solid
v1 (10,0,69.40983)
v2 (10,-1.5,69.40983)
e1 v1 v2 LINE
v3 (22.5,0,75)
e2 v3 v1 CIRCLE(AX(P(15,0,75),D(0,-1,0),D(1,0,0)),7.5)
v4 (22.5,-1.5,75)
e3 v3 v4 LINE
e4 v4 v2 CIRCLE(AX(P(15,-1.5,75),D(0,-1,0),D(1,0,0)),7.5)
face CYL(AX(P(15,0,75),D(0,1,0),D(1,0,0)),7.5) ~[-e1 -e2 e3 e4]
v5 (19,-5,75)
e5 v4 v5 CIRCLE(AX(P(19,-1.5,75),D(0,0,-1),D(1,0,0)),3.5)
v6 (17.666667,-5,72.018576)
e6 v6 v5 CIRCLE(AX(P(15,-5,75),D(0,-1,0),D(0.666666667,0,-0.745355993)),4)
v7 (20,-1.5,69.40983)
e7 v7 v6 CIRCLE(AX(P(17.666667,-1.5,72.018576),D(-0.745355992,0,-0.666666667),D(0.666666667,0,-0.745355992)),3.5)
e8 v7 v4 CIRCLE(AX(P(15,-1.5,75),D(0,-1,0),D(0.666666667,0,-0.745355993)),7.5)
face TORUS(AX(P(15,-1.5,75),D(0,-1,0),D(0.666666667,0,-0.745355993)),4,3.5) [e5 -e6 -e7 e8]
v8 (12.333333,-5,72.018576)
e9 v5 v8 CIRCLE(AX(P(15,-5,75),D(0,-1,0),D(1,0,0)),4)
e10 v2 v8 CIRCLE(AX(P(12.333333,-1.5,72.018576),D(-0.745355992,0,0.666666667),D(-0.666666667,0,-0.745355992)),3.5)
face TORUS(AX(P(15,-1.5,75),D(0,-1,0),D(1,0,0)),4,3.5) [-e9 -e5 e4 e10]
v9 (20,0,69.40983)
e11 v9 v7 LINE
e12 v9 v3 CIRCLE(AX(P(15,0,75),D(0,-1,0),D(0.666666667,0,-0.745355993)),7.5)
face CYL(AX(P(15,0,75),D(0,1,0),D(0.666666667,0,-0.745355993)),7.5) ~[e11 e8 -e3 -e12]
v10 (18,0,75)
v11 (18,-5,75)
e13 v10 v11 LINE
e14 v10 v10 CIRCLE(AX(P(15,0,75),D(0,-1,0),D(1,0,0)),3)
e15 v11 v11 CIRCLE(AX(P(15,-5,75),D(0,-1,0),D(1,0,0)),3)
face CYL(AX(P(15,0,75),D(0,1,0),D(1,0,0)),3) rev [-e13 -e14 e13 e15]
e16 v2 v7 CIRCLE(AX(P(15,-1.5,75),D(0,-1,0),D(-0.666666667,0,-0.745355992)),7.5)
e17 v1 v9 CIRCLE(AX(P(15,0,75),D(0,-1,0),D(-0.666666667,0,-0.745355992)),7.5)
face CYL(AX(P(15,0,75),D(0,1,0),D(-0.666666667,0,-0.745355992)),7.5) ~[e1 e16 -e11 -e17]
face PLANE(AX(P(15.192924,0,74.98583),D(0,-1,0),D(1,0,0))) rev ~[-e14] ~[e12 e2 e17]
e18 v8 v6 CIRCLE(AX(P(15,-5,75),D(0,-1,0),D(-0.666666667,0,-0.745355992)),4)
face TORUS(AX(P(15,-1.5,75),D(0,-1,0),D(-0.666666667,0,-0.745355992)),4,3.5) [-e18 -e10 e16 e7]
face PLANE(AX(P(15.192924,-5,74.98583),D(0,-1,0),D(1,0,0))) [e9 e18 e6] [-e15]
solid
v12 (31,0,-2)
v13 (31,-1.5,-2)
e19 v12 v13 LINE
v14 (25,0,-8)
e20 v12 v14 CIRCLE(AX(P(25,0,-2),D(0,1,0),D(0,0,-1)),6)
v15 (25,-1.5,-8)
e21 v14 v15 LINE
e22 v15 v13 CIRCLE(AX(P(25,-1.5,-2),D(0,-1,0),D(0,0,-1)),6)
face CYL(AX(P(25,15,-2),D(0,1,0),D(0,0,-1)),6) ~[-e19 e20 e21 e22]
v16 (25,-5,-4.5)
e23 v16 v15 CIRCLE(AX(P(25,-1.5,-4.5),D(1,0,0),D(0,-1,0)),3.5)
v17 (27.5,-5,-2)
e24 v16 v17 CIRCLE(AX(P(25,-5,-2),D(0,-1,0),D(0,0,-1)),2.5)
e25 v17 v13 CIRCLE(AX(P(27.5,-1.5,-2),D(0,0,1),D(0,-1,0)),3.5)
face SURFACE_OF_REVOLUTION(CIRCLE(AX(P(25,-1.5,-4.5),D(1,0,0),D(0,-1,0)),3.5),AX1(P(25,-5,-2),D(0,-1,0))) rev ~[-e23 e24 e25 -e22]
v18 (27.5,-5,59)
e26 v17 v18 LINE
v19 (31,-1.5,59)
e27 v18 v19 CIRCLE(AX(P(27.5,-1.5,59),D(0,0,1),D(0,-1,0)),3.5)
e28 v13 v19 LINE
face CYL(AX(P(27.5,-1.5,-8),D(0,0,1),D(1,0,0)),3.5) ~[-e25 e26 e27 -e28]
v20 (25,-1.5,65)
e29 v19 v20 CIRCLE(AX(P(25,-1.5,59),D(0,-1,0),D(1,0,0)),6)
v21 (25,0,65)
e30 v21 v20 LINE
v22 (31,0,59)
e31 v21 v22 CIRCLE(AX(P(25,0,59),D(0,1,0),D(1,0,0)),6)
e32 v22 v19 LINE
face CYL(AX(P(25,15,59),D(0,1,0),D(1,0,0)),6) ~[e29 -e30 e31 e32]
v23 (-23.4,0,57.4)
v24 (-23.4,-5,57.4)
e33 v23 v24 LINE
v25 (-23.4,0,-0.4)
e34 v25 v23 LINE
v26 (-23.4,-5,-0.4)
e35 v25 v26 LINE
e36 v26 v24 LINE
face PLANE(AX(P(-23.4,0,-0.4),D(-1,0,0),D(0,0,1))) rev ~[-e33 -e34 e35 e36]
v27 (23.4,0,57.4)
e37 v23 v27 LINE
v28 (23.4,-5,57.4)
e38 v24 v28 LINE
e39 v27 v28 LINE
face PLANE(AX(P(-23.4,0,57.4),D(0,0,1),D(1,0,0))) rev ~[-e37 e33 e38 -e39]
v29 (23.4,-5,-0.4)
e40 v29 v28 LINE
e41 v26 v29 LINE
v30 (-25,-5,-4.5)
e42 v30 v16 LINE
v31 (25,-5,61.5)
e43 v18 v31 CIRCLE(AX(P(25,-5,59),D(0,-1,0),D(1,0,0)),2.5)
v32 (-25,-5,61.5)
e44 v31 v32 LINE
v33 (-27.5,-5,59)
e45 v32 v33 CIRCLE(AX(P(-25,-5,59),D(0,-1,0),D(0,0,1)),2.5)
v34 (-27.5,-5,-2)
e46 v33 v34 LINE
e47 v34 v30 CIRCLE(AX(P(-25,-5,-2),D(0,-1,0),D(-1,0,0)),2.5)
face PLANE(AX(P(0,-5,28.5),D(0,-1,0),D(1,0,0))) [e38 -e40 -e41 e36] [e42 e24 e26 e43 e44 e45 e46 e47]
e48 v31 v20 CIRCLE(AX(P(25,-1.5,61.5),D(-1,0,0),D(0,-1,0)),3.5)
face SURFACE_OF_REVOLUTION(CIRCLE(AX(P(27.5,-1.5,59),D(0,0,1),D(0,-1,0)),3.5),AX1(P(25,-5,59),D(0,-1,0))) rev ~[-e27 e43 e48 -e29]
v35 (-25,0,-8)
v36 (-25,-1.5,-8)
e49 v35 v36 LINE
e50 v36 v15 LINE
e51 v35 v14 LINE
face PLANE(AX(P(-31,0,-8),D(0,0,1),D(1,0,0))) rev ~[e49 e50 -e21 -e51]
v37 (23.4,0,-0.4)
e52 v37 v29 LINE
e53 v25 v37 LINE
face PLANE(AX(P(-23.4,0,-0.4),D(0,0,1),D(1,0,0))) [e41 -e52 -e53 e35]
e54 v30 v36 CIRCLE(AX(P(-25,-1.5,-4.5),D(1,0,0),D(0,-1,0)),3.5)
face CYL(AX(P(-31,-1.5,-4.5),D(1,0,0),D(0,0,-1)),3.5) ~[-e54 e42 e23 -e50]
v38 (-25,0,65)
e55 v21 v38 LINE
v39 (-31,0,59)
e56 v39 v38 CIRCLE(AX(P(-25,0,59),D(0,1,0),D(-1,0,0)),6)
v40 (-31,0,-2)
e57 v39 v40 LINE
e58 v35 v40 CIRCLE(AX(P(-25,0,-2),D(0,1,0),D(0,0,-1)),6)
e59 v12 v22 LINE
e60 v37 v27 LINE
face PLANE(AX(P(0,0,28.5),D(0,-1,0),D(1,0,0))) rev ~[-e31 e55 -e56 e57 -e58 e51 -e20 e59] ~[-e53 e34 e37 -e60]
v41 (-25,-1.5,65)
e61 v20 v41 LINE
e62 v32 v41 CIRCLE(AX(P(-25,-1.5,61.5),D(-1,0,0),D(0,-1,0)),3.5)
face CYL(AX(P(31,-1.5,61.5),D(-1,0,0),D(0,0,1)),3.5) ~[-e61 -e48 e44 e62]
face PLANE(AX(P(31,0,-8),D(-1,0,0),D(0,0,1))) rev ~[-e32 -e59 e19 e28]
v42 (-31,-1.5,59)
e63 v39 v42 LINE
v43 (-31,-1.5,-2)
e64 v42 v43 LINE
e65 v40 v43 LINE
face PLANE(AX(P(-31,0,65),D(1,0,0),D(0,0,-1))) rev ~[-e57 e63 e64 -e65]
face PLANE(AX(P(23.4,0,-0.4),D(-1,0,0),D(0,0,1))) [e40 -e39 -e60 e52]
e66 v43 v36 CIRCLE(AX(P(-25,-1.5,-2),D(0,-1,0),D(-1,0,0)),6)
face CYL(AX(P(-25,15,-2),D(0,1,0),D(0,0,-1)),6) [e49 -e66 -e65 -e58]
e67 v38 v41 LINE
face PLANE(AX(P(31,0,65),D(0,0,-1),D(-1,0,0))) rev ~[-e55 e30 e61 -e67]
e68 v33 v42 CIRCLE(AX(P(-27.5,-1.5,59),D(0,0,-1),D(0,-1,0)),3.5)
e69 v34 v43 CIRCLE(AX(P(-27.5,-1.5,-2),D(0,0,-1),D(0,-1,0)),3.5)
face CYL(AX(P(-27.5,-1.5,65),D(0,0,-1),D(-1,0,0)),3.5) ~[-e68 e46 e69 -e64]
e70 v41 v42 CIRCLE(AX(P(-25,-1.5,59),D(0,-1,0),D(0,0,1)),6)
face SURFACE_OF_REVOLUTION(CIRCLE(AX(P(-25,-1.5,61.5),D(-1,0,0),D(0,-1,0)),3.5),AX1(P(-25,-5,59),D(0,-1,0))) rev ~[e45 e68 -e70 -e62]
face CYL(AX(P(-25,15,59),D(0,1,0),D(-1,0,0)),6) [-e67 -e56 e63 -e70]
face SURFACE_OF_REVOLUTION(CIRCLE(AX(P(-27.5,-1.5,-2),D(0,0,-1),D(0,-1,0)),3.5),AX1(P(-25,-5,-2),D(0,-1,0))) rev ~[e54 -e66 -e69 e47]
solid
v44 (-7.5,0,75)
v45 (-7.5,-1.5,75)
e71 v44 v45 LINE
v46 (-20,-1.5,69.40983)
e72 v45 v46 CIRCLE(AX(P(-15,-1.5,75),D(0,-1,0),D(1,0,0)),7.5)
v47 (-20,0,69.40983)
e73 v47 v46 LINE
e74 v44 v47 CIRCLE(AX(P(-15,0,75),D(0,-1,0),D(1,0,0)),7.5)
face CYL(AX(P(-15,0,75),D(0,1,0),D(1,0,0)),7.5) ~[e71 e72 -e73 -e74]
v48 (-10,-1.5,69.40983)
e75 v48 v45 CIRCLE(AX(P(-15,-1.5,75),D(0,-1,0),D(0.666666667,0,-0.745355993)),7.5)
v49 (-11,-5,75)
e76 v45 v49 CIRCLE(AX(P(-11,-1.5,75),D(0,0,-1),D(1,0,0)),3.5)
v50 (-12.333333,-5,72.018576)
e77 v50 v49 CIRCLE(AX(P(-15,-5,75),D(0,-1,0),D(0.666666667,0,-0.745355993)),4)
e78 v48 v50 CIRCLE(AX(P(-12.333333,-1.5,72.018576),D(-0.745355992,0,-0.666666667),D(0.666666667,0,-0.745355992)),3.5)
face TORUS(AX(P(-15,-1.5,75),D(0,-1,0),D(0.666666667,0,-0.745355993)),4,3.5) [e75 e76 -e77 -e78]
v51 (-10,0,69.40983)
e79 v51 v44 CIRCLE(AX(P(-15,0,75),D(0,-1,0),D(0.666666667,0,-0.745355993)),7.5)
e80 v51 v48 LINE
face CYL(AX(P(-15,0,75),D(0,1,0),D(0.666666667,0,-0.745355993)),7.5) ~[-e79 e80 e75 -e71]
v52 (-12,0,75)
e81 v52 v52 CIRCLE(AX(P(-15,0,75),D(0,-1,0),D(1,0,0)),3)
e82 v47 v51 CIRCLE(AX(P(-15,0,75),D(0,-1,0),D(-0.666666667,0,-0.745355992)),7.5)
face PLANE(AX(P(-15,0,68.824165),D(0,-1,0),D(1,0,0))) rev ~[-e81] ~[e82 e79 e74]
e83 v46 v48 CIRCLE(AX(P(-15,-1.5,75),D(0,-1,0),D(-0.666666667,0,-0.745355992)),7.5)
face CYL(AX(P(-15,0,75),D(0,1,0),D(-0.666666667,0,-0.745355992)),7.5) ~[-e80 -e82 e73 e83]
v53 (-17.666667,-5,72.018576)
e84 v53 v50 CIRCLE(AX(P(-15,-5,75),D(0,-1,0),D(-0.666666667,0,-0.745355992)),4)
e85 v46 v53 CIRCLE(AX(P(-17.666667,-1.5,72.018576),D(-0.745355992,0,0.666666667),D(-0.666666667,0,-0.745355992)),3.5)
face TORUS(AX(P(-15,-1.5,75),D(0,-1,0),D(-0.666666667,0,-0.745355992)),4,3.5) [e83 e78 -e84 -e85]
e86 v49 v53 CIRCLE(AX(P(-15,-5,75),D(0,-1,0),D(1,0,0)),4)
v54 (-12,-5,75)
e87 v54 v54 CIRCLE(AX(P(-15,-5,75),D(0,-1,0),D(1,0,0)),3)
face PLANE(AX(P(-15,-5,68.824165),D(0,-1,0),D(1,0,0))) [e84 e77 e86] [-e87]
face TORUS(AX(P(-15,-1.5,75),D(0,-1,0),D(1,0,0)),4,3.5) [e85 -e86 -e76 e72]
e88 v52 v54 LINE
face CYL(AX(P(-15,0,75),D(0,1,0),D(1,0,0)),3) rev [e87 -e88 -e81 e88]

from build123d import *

# Parameters (mm, degrees)
F5_W         = 46
F5_H         = 57
F0_DEPTH     = 5
F5_R         = 3
F2_R         = 3.5
F2_2_R       = 3.5
F2_3_R       = 3.5
F3_T1_DEPTH  = 20
F3_T4_ANGLE  = 90
F3_T6_ANGLE  = 90
F3_T8_ANGLE  = 90
F3_T10_ANGLE = 90
F6_R         = 1.5
F7_W         = 46.8
F7_H         = 57.8
F7_W_2       = 46
F7_H_2       = 57
F4_DEPTH     = 5


# Not quite as in the source:
# - a fillet or chamfer that OpenCascade refuses, or shapes differently, is made with other operations: its cross-section is extruded or revolved along the edge and cut away or added
# - a feature of the source that left no trace in its solid (it failed there, or was rolled back) is left out
# - a feature names something its author has since deleted; it is built from what else it names


with BuildPart() as f0:
    # F5 (on Front) → F0 (new body)
    with BuildSketch(Plane.XZ):
        Polygon((-31, -8), (31, -8), (31, 65), (20, 65), (15.5901699437, 65), (15, 65), (10, 65), (5.5901699437, 65), (0, 65), (-5.5901699437, 65), (-10, 65), (-15, 65), (-15.5901699437, 65), (-20, 65), (-31, 65), align=None)
        with Locations((0, 28.5)):
            Rectangle(F5_W, F5_H, mode=Mode.SUBTRACT)
    extrude(amount=F0_DEPTH)

    # F2
    f2_edges = [f0.edges().sort_by_distance(p)[0] for p in [
        (31, -5, 28.5),
        (0, -5, 65),
        (-31, -5, 28.5),
        (0, -5, -8),
    ]]
    fillet(f2_edges, radius=F2_R)

    # F3: fillet of radius 6 on 4 edges, made by hand

    # F3_s2 → F3_t1 (cut)
    with BuildSketch(Plane.XZ.offset(-15)):
        with BuildLine():
            ThreePointArc((-25, -8), (-29.2426406871, -6.2426406871), (-31, -2))
            Line((-31, -2), (-31, -8))
            Line((-31, -8), (-25, -8))
        make_face()
        with BuildLine():
            ThreePointArc((-31, 59), (-29.2426406871, 63.2426406871), (-25, 65))
            Line((-25, 65), (-31, 65))
            Line((-31, 65), (-31, 59))
        make_face()
        with BuildLine():
            ThreePointArc((31, 59), (29.2426406871, 63.2426406871), (25, 65))
            Line((25, 65), (31, 65))
            Line((31, 65), (31, 59))
        make_face()
        with BuildLine():
            ThreePointArc((25, -8), (29.2426406871, -6.2426406871), (31, -2))
            Line((31, -2), (31, -8))
            Line((31, -8), (25, -8))
        make_face()
    extrude(amount=F3_T1_DEPTH, mode=Mode.SUBTRACT)

    # F3_s3 → F3_t4 (revolve, cut)
    with BuildSketch(Plane.YZ.offset(25)):
        with BuildLine():
            ThreePointArc((-5, -4.5), (-3.9748737342, -6.9748737342), (-1.5, -8))
            Line((-1.5, -8), (-5, -8))
            Line((-5, -8), (-5, -4.5))
        make_face()
    revolve(axis=Axis((25, -5, -2), (0, -1, 0)), revolution_arc=F3_T4_ANGLE, mode=Mode.SUBTRACT)

    # F3_s5 → F3_t6 (revolve, cut)
    with BuildSketch(Plane.XY.offset(59)):
        with BuildLine():
            ThreePointArc((27.5, -5), (29.9748737342, -3.9748737342), (31, -1.5))
            Line((31, -1.5), (31, -5))
            Line((31, -5), (27.5, -5))
        make_face()
    revolve(axis=Axis((25, -5, 59), (0, -1, 0)), revolution_arc=F3_T6_ANGLE, mode=Mode.SUBTRACT)

    # F3_s7 → F3_t8 (revolve, cut)
    with BuildSketch(Plane.YZ.offset(-25)):
        with BuildLine():
            ThreePointArc((-5, 61.5), (-3.9748737342, 63.9748737342), (-1.5, 65))
            Line((-1.5, 65), (-5, 65))
            Line((-5, 65), (-5, 61.5))
        make_face()
    revolve(axis=Axis((-25, -5, 59), (0, -1, 0)), revolution_arc=F3_T8_ANGLE, mode=Mode.SUBTRACT)

    # F3_s9 → F3_t10 (revolve, cut)
    with BuildSketch(Plane.XY.offset(-2)):
        with BuildLine():
            ThreePointArc((-27.5, -5), (-29.9748737342, -3.9748737342), (-31, -1.5))
            Line((-31, -1.5), (-31, -5))
            Line((-31, -5), (-27.5, -5))
        make_face()
    revolve(axis=Axis((-25, -5, -2), (0, -1, 0)), revolution_arc=F3_T10_ANGLE, mode=Mode.SUBTRACT)

    # F6
    f6_edges = [f0.edges().sort_by_distance(p)[0] for p in [
        (-23, -2.5, 57),
        (23, -2.5, 57),
        (23, -2.5, 0),
        (-23, -2.5, 0),
    ]]
    fillet(f6_edges, radius=F6_R)

    # F7 (on face) → F4 (cut, through all)
    with BuildSketch(Plane.XZ):
        with Locations((0, 28.5)):
            Rectangle(F7_W, F7_H)
        with Locations((0, 28.5)):
            Rectangle(F7_W_2, F7_H_2, mode=Mode.SUBTRACT)
        with Locations((0, 28.5)):
            Rectangle(F7_W_2, F7_H_2)
    extrude(amount=F4_DEPTH, mode=Mode.SUBTRACT)


with BuildPart() as f0b:
    # F5 (on Front) → F0, piece 2 (new body)
    with BuildSketch(Plane.XZ):
        with BuildLine():
            Line((10, 69.4098300563), (20, 69.4098300563))
            ThreePointArc((20, 69.4098300563), (21.8465319688, 71.9381378215), (22.5, 75))
            ThreePointArc((22.5, 75), (11.9381378215, 81.8465319688), (10, 69.4098300563))
        make_face()
        with Locations((15, 75)):
            Circle(F5_R, mode=Mode.SUBTRACT)
        with BuildLine():
            ThreePointArc((10, 69.4098300563), (15, 67.5), (20, 69.4098300563))
            Line((20, 69.4098300563), (10, 69.4098300563))
        make_face()
    extrude(amount=F0_DEPTH)

    # F2#2
    f2_2_edges = [f0b.edges().sort_by_distance(p)[0] for p in [
        (7.5, -5, 75),
    ]]
    fillet(f2_2_edges, radius=F2_2_R)


with BuildPart() as f0c:
    # F5 (on Front) → F0, piece 3 (new body)
    with BuildSketch(Plane.XZ):
        with BuildLine():
            Line((-10, 69.4098300563), (-20, 69.4098300563))
            ThreePointArc((-20, 69.4098300563), (-15, 67.5), (-10, 69.4098300563))
        make_face()
        with BuildLine():
            ThreePointArc((-7.5, 75), (-18.0618621785, 81.8465319688), (-20, 69.4098300563))
            Line((-20, 69.4098300563), (-10, 69.4098300563))
            ThreePointArc((-10, 69.4098300563), (-8.1534680312, 71.9381378215), (-7.5, 75))
        make_face()
        with Locations((-15, 75)):
            Circle(F5_R, mode=Mode.SUBTRACT)
    extrude(amount=F0_DEPTH)

    # F2#3
    f2_3_edges = [f0c.edges().sort_by_distance(p)[0] for p in [
        (-20, -5, 80.59017),
    ]]
    fillet(f2_3_edges, radius=F2_3_R)


solid = Compound([f0.part, f0b.part, f0c.part])
